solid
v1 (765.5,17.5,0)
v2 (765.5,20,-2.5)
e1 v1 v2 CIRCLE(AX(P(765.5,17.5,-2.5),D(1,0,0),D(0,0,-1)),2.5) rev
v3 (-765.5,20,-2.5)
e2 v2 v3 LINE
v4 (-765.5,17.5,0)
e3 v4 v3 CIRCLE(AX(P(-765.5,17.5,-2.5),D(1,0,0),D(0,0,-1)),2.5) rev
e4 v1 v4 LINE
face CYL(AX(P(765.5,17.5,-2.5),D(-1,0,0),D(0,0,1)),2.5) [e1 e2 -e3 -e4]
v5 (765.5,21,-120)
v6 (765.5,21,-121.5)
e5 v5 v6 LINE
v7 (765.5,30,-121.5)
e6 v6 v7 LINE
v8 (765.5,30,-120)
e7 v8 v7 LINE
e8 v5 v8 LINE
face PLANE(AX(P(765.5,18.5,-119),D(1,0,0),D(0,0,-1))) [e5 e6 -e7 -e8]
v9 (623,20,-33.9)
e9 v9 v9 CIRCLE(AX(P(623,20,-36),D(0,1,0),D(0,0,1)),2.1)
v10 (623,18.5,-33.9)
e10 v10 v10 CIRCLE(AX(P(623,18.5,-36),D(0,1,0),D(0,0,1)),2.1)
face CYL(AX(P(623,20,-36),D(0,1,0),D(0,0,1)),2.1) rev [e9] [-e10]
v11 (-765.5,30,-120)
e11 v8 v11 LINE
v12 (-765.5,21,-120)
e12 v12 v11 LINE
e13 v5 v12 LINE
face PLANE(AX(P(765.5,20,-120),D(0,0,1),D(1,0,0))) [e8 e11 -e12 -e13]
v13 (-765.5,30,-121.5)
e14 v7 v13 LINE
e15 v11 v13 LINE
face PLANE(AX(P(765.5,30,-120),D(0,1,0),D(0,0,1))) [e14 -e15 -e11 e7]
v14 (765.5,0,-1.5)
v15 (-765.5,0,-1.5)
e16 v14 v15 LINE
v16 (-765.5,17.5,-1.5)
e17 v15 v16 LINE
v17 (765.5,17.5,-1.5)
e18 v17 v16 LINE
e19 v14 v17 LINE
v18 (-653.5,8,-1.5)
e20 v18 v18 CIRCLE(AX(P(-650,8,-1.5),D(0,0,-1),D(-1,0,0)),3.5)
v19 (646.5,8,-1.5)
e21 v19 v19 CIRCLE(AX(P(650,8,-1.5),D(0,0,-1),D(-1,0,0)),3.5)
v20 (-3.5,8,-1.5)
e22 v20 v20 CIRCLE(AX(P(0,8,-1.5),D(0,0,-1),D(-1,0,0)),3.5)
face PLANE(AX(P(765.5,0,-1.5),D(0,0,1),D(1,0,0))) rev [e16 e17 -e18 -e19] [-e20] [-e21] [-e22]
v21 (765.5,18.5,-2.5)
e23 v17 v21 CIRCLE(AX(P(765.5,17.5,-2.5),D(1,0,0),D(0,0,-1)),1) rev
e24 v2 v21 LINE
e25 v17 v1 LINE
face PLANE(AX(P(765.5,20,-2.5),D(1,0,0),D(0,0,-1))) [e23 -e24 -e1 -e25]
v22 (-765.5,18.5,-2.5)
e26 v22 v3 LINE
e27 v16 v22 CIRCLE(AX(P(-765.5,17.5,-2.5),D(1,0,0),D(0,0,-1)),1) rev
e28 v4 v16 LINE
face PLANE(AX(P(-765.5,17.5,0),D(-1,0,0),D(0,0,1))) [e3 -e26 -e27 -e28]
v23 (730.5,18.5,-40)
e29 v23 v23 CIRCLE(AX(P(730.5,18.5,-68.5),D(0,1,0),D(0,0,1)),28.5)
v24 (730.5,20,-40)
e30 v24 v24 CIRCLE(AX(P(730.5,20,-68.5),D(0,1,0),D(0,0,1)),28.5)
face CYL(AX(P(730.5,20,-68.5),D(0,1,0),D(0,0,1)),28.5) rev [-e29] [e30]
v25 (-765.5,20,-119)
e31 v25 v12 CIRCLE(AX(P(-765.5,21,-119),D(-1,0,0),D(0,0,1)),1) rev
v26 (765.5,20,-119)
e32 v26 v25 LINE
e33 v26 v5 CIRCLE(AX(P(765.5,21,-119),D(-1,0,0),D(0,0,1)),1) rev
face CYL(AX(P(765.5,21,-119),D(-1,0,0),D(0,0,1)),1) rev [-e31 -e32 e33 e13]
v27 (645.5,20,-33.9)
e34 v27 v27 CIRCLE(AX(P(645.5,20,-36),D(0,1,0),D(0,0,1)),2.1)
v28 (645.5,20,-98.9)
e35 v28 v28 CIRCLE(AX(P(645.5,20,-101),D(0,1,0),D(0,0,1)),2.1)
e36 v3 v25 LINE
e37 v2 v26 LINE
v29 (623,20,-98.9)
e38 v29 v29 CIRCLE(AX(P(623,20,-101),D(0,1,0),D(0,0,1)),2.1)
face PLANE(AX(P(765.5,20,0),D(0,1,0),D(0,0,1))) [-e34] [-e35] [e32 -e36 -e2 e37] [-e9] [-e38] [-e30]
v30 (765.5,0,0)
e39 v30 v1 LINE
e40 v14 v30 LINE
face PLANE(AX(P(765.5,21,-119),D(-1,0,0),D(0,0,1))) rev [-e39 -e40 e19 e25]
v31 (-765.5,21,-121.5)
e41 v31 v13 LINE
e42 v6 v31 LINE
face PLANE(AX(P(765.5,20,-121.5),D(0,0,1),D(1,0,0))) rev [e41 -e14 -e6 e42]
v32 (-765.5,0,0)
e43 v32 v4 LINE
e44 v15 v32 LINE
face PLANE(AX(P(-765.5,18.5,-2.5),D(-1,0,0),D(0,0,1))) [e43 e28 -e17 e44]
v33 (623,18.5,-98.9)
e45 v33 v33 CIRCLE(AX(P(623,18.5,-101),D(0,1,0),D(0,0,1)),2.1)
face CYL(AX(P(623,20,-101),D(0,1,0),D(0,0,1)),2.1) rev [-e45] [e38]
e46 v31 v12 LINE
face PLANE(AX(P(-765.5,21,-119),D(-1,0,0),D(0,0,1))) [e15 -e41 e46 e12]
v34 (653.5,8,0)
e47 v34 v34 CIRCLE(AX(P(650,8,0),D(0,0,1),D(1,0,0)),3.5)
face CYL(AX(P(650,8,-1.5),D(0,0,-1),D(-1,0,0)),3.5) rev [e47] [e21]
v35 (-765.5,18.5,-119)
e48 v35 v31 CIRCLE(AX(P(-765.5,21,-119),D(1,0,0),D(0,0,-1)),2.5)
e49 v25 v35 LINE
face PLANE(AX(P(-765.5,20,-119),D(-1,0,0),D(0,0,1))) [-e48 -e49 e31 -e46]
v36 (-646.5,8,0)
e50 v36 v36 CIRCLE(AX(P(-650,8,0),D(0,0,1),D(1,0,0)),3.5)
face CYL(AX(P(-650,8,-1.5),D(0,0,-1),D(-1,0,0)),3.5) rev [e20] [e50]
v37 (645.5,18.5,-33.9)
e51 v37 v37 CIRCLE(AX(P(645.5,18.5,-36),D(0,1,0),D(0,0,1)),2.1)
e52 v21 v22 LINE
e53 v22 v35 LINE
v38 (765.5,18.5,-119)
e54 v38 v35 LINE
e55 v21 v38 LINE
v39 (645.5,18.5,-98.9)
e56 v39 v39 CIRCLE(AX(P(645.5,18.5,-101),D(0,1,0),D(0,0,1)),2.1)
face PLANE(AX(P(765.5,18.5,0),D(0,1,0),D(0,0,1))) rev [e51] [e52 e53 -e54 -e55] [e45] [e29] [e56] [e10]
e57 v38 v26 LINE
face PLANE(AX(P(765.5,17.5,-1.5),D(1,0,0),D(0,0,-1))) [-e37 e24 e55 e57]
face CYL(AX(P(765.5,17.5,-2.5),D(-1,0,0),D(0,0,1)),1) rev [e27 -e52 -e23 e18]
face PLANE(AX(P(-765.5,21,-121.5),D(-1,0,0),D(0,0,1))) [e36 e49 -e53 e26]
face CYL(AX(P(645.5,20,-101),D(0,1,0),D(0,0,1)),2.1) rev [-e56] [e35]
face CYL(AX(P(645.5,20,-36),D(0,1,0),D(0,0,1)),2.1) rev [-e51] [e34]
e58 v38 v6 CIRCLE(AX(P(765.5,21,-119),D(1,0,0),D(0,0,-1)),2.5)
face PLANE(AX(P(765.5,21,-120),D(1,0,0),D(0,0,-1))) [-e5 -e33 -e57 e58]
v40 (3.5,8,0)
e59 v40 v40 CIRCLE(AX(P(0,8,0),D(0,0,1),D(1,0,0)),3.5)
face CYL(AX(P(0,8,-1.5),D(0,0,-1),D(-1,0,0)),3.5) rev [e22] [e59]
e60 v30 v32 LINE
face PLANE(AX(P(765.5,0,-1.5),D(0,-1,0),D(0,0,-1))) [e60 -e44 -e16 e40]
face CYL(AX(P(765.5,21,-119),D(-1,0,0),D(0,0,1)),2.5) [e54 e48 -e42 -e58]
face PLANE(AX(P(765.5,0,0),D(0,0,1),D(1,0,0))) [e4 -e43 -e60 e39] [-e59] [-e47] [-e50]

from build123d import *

# Parameters (mm, degrees)
SM_BASE_FLANGE_1_DEPTH = 765.5
HOLE_WIZARD_M6_1_D     = 7
HOLE_WIZARD_M5_1_D     = 4.2
HOLE_WIZARD_1_D        = 57


# Sheet-metal steps are written as plain solids
with BuildPart() as part:
    # Sketch 1 → 基体-法兰1 (new, symmetric)
    with BuildSketch(Plane(origin=(0, 0, 0), x_dir=(0, 0, -1), z_dir=(1, 0, 0))):
        with BuildLine():
            Line((0, 0), (0, 17.5))
            ThreePointArc((0, 17.5), (0.732233047, 19.267766953), (2.5, 20))
            Line((2.5, 20), (119, 20))
            ThreePointArc((119, 20), (119.707106781, 20.292893219), (120, 21))
            Line((120, 21), (120, 30))
            Line((120, 30), (121.5, 30))
            Line((121.5, 30), (121.5, 21))
            ThreePointArc((121.5, 21), (120.767766953, 19.232233047), (119, 18.5))
            Line((119, 18.5), (2.5, 18.5))
            ThreePointArc((2.5, 18.5), (1.792893219, 18.207106781), (1.5, 17.5))
            Line((1.5, 17.5), (1.5, 0))
            Line((1.5, 0), (0, 0))
        make_face()
    extrude(amount=SM_BASE_FLANGE_1_DEPTH, both=True)

    # M6 间隙孔1 (through all)
    with Locations(Plane(origin=(0, 0, -1.5), x_dir=(-1, 0, 0), z_dir=(0, 0, -1))):
        with Locations((-650, 8), (0, 8), (650, 8)):
            Hole(HOLE_WIZARD_M6_1_D / 2)

    # M5 螺纹孔1 (through all)
    with Locations(Plane(origin=(0, 20, 0), x_dir=(1, 0, 0), z_dir=(0, 1, 0))):
        with Locations((645.5, 36), (623, 36), (623, 101), (645.5, 101)):
            Hole(HOLE_WIZARD_M5_1_D / 2)

    # 孔1 (through all)
    with Locations(Plane(origin=(0, 20, 0), x_dir=(1, 0, 0), z_dir=(0, 1, 0))):
        with Locations((730.5, 68.5)):
            Hole(HOLE_WIZARD_1_D / 2)


solid = part.part
